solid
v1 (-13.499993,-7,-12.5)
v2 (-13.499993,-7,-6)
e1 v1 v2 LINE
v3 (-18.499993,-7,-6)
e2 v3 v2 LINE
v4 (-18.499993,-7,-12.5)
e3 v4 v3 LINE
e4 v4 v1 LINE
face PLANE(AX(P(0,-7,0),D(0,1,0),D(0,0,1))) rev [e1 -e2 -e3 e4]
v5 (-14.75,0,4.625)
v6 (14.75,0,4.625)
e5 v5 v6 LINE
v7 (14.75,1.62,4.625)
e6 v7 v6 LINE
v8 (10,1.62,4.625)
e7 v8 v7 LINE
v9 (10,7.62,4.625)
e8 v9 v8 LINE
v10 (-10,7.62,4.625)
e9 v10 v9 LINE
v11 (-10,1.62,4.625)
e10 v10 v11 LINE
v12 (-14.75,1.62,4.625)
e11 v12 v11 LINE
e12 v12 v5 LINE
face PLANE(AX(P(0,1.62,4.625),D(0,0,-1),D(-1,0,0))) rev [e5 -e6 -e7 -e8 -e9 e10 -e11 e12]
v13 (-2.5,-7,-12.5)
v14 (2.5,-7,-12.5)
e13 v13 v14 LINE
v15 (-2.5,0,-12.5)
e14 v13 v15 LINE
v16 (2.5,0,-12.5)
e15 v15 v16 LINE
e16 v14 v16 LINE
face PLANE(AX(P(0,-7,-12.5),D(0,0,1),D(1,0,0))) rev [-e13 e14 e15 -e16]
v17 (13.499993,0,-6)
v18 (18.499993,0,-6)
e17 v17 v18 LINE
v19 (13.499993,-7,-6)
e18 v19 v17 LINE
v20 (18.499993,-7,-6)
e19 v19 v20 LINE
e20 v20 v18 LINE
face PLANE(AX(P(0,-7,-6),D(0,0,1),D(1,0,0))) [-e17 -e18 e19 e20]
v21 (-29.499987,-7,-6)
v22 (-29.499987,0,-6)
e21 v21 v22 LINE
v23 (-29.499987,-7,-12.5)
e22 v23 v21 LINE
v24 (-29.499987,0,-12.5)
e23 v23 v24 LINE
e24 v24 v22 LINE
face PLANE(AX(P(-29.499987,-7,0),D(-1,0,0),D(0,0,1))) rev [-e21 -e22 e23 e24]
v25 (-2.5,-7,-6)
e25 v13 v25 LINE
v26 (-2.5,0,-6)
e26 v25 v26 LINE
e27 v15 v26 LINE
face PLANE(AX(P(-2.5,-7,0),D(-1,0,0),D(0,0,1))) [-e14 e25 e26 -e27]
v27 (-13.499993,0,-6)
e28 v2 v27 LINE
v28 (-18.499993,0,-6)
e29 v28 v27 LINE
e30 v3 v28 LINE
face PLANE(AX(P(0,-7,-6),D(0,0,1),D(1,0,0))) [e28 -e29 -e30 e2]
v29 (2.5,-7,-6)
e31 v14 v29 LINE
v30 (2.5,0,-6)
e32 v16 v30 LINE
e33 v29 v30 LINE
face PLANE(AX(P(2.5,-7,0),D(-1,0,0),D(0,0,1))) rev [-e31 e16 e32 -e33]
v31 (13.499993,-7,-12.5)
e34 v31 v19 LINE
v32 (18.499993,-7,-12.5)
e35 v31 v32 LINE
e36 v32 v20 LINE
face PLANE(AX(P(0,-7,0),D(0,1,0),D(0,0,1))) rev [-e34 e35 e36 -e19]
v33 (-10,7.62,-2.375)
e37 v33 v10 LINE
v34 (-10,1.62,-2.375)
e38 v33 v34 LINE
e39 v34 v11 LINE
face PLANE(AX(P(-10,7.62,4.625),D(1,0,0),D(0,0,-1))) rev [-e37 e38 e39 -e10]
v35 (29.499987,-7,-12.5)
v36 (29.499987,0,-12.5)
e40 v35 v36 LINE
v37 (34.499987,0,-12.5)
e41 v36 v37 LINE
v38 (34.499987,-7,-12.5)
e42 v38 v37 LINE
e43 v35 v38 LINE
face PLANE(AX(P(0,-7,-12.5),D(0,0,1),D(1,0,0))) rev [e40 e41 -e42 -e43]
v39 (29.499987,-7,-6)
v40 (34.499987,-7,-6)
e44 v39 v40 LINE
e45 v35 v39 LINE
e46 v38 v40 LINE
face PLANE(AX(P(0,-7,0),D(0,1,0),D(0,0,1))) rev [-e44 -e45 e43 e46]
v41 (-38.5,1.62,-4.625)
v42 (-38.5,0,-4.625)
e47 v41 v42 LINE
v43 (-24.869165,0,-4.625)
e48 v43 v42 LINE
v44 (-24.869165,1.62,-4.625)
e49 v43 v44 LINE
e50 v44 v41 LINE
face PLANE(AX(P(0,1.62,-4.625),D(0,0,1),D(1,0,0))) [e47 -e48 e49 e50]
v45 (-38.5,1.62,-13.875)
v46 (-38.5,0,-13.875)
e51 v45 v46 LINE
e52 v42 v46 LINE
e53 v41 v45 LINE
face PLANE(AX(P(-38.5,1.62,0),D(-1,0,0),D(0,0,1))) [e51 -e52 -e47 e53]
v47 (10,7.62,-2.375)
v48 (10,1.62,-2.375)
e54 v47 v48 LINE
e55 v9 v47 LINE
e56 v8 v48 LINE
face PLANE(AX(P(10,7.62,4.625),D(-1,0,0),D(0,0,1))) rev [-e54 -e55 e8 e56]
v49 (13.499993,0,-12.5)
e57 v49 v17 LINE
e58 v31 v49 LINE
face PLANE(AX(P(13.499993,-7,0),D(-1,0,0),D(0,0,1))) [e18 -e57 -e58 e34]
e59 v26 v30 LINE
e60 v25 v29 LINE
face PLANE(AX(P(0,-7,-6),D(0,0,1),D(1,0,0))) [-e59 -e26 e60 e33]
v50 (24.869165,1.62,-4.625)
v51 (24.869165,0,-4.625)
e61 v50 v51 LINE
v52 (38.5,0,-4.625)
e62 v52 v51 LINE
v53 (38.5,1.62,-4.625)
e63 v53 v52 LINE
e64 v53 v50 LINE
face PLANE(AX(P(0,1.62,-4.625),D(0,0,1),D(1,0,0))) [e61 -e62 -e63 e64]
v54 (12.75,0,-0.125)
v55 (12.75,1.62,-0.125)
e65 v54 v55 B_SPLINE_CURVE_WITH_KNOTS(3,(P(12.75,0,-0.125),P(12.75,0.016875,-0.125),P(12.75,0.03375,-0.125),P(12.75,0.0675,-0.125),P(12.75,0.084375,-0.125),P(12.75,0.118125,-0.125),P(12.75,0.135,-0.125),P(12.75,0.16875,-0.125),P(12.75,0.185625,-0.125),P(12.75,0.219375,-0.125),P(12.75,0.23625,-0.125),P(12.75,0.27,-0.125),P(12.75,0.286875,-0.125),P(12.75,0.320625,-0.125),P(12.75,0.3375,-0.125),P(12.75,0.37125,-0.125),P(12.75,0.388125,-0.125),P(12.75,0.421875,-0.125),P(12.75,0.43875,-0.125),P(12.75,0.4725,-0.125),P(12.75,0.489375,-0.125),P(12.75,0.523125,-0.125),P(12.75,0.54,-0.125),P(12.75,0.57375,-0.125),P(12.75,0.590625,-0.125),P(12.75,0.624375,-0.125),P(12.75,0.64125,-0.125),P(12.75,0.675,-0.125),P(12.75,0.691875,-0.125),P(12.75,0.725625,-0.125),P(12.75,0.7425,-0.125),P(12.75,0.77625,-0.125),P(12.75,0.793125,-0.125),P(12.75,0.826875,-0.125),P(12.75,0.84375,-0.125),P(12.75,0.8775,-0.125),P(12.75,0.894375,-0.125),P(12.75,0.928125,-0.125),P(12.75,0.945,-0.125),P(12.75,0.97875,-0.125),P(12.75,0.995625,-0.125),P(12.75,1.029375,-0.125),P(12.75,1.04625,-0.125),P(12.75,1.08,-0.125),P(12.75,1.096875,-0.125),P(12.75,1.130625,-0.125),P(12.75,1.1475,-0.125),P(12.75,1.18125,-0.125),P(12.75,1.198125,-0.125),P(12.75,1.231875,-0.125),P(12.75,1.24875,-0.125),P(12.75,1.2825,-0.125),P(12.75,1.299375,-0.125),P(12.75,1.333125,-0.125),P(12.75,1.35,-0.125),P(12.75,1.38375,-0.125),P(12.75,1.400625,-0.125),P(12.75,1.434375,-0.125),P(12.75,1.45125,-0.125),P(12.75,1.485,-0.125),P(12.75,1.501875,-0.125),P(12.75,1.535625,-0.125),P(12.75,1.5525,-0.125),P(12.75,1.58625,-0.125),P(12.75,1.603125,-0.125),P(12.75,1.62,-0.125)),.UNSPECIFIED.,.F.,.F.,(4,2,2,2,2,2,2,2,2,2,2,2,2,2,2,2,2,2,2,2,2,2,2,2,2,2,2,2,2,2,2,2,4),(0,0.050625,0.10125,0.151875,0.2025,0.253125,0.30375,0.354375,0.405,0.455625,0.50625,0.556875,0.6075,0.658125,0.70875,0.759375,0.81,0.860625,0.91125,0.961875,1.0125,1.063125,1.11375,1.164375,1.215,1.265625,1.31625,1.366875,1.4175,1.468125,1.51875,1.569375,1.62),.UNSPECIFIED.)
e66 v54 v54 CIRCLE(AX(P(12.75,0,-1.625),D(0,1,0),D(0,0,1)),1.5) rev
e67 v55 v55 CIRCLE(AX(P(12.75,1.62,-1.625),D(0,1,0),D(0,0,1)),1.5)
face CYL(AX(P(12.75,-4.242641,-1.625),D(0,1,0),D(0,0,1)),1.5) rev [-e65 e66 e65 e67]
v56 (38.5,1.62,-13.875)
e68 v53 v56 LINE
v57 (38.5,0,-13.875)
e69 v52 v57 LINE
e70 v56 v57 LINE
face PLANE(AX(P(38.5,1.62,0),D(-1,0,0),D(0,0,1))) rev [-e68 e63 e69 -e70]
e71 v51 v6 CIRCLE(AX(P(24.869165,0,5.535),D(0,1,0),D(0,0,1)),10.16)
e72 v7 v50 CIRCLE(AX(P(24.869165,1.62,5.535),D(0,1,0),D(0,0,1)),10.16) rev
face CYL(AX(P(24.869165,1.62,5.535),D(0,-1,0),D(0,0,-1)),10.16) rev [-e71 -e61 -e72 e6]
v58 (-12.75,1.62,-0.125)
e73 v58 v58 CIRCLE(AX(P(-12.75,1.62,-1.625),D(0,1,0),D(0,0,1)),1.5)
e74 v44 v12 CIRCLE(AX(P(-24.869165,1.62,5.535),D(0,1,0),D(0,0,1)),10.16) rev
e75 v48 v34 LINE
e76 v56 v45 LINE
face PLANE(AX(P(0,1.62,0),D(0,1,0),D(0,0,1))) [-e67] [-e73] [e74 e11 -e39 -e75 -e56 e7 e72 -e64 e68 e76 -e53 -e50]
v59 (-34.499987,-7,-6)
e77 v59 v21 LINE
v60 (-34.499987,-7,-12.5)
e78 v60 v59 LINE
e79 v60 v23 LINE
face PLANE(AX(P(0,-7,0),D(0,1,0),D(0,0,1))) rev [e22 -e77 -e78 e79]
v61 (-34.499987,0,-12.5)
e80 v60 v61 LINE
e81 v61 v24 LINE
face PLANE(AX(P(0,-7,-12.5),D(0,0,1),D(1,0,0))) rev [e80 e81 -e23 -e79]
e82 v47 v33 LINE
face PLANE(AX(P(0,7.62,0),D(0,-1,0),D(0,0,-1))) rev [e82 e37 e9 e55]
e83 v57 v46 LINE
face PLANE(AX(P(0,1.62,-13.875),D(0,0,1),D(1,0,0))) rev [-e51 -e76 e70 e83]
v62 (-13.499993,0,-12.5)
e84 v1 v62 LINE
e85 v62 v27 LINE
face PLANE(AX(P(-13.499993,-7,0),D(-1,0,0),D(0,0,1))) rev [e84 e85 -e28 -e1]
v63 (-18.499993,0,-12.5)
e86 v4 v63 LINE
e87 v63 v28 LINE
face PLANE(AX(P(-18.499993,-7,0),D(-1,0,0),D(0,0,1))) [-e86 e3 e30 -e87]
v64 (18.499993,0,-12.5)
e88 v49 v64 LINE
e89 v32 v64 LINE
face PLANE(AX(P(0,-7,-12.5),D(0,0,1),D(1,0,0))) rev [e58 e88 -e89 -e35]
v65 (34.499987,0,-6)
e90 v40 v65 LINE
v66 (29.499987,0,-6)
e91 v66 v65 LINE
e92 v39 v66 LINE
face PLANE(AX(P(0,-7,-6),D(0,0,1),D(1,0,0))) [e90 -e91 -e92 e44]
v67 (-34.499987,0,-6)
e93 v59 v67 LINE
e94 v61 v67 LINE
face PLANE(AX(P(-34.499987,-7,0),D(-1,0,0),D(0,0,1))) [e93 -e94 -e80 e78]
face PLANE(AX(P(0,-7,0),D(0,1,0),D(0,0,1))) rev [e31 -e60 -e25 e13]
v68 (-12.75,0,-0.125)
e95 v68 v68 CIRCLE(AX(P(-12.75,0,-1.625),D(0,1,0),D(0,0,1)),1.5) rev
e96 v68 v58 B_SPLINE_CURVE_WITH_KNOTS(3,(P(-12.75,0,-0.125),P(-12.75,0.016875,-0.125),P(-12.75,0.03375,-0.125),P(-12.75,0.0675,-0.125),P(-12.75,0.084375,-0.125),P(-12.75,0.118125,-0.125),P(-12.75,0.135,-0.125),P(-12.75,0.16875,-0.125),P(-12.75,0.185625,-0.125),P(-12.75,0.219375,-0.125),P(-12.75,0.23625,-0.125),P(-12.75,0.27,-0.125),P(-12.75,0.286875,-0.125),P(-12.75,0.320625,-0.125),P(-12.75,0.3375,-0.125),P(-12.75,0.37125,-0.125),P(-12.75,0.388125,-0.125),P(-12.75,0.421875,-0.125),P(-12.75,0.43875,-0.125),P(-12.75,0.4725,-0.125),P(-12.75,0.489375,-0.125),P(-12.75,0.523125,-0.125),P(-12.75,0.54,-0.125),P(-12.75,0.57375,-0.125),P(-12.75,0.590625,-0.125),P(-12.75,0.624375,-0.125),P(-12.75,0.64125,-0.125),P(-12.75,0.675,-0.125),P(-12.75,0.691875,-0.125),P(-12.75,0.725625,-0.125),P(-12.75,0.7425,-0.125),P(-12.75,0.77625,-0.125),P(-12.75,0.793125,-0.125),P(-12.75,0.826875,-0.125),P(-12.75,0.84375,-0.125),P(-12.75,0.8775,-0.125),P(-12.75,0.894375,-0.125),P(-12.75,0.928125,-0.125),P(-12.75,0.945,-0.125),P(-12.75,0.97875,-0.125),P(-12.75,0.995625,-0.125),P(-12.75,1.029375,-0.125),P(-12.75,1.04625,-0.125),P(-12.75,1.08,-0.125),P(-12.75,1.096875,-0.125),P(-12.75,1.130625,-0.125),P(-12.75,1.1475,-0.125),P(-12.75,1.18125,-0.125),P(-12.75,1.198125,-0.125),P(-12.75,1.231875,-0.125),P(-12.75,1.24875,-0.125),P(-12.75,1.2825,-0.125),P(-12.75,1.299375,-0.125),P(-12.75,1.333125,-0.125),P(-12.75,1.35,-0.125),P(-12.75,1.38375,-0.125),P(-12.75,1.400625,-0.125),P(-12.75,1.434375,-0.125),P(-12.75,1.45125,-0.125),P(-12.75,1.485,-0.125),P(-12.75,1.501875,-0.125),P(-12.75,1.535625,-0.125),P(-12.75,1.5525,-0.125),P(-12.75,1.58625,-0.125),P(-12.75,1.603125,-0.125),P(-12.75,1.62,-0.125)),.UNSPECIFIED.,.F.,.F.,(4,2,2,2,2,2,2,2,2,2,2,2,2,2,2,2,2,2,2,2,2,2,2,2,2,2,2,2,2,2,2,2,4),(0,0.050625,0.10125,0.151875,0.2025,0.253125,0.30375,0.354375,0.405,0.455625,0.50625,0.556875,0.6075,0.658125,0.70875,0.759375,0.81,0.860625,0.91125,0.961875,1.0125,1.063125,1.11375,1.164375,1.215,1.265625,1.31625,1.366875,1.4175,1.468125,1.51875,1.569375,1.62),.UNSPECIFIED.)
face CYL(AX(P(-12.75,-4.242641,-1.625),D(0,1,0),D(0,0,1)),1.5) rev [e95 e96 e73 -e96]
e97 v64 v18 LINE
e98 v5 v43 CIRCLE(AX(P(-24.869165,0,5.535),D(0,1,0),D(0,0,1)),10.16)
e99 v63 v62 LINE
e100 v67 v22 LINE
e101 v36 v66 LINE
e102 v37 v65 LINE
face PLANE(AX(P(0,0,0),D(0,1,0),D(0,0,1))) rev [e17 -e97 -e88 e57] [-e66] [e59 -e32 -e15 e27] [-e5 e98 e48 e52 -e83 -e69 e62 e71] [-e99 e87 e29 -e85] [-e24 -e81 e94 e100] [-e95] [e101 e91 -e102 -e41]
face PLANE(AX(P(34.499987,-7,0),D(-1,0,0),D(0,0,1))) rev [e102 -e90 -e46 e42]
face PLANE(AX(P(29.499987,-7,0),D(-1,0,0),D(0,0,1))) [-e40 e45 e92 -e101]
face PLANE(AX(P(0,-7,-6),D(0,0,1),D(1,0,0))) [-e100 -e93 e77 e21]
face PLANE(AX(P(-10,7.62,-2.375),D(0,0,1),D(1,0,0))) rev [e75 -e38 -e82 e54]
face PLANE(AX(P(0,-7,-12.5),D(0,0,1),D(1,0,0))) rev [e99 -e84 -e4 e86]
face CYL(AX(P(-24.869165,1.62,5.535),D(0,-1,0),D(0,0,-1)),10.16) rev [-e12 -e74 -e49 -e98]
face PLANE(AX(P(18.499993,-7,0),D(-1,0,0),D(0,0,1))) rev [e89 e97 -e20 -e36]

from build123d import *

# Parameters (mm, degrees)
SKETCH1_W           = 5
SKETCH1_H           = 6.5
SKETCH1_W_2         = 29.5
SKETCH1_H_2         = 9.25
BOSS_EXTRUDE1_DEPTH = 1.62
FILLET1_R           = 10.16
SKETCH1_3_W         = 5
SKETCH1_3_H         = 6.5
BOSS_EXTRUDE2_DEPTH = 7
SKETCH2_R           = 1.5
CUT_EXTRUDE1_DEPTH  = 1.62
SKETCH3_W           = 20
SKETCH3_H           = 7
BOSS_EXTRUDE3_DEPTH = 6


with BuildPart() as part:
    # Sketch1 → Boss-Extrude1 (new body)
    # profile 1 of 7: a face of its own
    with BuildSketch(Plane(origin=(0, 0, 0), x_dir=(1, 0, 0), z_dir=(0, 1, 0))):
        Polygon((-38.5, 4.625), (-14.75, 4.625), (14.75, 4.625), (38.5, 4.625), (38.5, 13.875), (-38.5, 13.875), align=None)
        with Locations((-31.9999868, 9.25)):
            Rectangle(SKETCH1_W, SKETCH1_H, mode=Mode.SUBTRACT)
        with Locations((-15.9999934, 9.25)):
            Rectangle(SKETCH1_W, SKETCH1_H, mode=Mode.SUBTRACT)
        with Locations((0, 9.25)):
            Rectangle(SKETCH1_W, SKETCH1_H, mode=Mode.SUBTRACT)
        with Locations((15.9999934, 9.25)):
            Rectangle(SKETCH1_W, SKETCH1_H, mode=Mode.SUBTRACT)
        with Locations((31.9999868, 9.25)):
            Rectangle(SKETCH1_W, SKETCH1_H, mode=Mode.SUBTRACT)
    # profile 2 of 7: a face of its own
    with BuildSketch(Plane(origin=(0, 0, 0), x_dir=(1, 0, 0), z_dir=(0, 1, 0))):
        with Locations((-31.9999868, 9.25)):
            Rectangle(SKETCH1_W, SKETCH1_H)
    # profile 3 of 7: a face of its own
    with BuildSketch(Plane(origin=(0, 0, 0), x_dir=(1, 0, 0), z_dir=(0, 1, 0))):
        with Locations((-15.9999934, 9.25)):
            Rectangle(SKETCH1_W, SKETCH1_H)
    # profile 4 of 7: a face of its own
    with BuildSketch(Plane(origin=(0, 0, 0), x_dir=(1, 0, 0), z_dir=(0, 1, 0))):
        Rectangle(SKETCH1_W_2, SKETCH1_H_2)
    # profile 5 of 7: a face of its own
    with BuildSketch(Plane(origin=(0, 0, 0), x_dir=(1, 0, 0), z_dir=(0, 1, 0))):
        with Locations((0, 9.25)):
            Rectangle(SKETCH1_W, SKETCH1_H)
    # profile 6 of 7: a face of its own
    with BuildSketch(Plane(origin=(0, 0, 0), x_dir=(1, 0, 0), z_dir=(0, 1, 0))):
        with Locations((15.9999934, 9.25)):
            Rectangle(SKETCH1_W, SKETCH1_H)
    # profile 7 of 7: a face of its own
    with BuildSketch(Plane(origin=(0, 0, 0), x_dir=(1, 0, 0), z_dir=(0, 1, 0))):
        with Locations((31.9999868, 9.25)):
            Rectangle(SKETCH1_W, SKETCH1_H)
    extrude(amount=BOSS_EXTRUDE1_DEPTH)

    # Fillet1
    # the kernel refuses this fillet: 10.16 mm, written as the material it adds along each edge
    with BuildSketch(Plane(origin=(14.75, 0, -4.625), x_dir=(0, 0, 1), z_dir=(0, 1, 0))) as fillet1_piece_1:
        with BuildLine():
            CenterArc((10.16, 10.119164985), FILLET1_R, 180, 84.861306661)
            Line((0, 10.119164985), (-0.2032, 10.119164985))
            Line((-0.2032, 10.119164985), (-0.2032, 0))
            Line((-0.2032, 0), (0, -0.2032))
            ThreePointArc((0, -0.2032), (4.625, -0.2032), (9.2318, -0.2023833))
            Line((9.2318, -0.2023833), (9.25, 0))
        make_face()
    extrude(amount=1.62)
    with BuildSketch(Plane(origin=(-14.75, 0, -4.625), x_dir=(-1, 0, 0), z_dir=(0, 1, 0))) as fillet1_piece_2:
        with BuildLine():
            CenterArc((10.119164985, 10.16), FILLET1_R, 185.138693339, 84.861306661)
            Line((0, 9.25), (-0.2023833, 9.2318))
            ThreePointArc((-0.2023833, 9.2318), (-0.2032, 4.625), (-0.2032, 0))
            Line((-0.2032, 0), (0, -0.2032))
            Line((0, -0.2032), (10.119164985, -0.2032))
            Line((10.119164985, -0.2032), (10.119164985, 0))
        make_face()
    extrude(amount=1.62)

    # Sketch1<3> → Boss-Extrude2 (add)
    with BuildSketch(Plane(origin=(0, 0, 0), x_dir=(1, 0, 0), z_dir=(0, 1, 0))):
        with Locations((31.9999868, 9.25)):
            Rectangle(SKETCH1_3_W, SKETCH1_3_H)
        with Locations((15.9999934, 9.25)):
            Rectangle(SKETCH1_3_W, SKETCH1_3_H)
        with Locations((0, 9.25)):
            Rectangle(SKETCH1_3_W, SKETCH1_3_H)
        with Locations((-15.9999934, 9.25)):
            Rectangle(SKETCH1_3_W, SKETCH1_3_H)
        with Locations((-31.9999868, 9.25)):
            Rectangle(SKETCH1_3_W, SKETCH1_3_H)
    extrude(amount=-BOSS_EXTRUDE2_DEPTH)

    # Sketch2 → Cut-Extrude1 (cut)
    with BuildSketch(Plane(origin=(0, 1.62, 0), x_dir=(1, 0, 0), z_dir=(0, 1, 0))):
        with Locations(Location((-12.749999979, 1.624999898, 0), (0, 0, 270))):
            Circle(SKETCH2_R)
        with Locations(Location((12.749999979, 1.624999898, 0), (0, 0, 270))):
            Circle(SKETCH2_R)
    extrude(amount=-CUT_EXTRUDE1_DEPTH, mode=Mode.SUBTRACT)

    # Sketch3 → Boss-Extrude3 (add)
    with BuildSketch(Plane(origin=(0, 1.62, 0), x_dir=(1, 0, 0), z_dir=(0, 1, 0))):
        with Locations((0, -1.125)):
            Rectangle(SKETCH3_W, SKETCH3_H)
    extrude(amount=BOSS_EXTRUDE3_DEPTH)


solid = part.part
